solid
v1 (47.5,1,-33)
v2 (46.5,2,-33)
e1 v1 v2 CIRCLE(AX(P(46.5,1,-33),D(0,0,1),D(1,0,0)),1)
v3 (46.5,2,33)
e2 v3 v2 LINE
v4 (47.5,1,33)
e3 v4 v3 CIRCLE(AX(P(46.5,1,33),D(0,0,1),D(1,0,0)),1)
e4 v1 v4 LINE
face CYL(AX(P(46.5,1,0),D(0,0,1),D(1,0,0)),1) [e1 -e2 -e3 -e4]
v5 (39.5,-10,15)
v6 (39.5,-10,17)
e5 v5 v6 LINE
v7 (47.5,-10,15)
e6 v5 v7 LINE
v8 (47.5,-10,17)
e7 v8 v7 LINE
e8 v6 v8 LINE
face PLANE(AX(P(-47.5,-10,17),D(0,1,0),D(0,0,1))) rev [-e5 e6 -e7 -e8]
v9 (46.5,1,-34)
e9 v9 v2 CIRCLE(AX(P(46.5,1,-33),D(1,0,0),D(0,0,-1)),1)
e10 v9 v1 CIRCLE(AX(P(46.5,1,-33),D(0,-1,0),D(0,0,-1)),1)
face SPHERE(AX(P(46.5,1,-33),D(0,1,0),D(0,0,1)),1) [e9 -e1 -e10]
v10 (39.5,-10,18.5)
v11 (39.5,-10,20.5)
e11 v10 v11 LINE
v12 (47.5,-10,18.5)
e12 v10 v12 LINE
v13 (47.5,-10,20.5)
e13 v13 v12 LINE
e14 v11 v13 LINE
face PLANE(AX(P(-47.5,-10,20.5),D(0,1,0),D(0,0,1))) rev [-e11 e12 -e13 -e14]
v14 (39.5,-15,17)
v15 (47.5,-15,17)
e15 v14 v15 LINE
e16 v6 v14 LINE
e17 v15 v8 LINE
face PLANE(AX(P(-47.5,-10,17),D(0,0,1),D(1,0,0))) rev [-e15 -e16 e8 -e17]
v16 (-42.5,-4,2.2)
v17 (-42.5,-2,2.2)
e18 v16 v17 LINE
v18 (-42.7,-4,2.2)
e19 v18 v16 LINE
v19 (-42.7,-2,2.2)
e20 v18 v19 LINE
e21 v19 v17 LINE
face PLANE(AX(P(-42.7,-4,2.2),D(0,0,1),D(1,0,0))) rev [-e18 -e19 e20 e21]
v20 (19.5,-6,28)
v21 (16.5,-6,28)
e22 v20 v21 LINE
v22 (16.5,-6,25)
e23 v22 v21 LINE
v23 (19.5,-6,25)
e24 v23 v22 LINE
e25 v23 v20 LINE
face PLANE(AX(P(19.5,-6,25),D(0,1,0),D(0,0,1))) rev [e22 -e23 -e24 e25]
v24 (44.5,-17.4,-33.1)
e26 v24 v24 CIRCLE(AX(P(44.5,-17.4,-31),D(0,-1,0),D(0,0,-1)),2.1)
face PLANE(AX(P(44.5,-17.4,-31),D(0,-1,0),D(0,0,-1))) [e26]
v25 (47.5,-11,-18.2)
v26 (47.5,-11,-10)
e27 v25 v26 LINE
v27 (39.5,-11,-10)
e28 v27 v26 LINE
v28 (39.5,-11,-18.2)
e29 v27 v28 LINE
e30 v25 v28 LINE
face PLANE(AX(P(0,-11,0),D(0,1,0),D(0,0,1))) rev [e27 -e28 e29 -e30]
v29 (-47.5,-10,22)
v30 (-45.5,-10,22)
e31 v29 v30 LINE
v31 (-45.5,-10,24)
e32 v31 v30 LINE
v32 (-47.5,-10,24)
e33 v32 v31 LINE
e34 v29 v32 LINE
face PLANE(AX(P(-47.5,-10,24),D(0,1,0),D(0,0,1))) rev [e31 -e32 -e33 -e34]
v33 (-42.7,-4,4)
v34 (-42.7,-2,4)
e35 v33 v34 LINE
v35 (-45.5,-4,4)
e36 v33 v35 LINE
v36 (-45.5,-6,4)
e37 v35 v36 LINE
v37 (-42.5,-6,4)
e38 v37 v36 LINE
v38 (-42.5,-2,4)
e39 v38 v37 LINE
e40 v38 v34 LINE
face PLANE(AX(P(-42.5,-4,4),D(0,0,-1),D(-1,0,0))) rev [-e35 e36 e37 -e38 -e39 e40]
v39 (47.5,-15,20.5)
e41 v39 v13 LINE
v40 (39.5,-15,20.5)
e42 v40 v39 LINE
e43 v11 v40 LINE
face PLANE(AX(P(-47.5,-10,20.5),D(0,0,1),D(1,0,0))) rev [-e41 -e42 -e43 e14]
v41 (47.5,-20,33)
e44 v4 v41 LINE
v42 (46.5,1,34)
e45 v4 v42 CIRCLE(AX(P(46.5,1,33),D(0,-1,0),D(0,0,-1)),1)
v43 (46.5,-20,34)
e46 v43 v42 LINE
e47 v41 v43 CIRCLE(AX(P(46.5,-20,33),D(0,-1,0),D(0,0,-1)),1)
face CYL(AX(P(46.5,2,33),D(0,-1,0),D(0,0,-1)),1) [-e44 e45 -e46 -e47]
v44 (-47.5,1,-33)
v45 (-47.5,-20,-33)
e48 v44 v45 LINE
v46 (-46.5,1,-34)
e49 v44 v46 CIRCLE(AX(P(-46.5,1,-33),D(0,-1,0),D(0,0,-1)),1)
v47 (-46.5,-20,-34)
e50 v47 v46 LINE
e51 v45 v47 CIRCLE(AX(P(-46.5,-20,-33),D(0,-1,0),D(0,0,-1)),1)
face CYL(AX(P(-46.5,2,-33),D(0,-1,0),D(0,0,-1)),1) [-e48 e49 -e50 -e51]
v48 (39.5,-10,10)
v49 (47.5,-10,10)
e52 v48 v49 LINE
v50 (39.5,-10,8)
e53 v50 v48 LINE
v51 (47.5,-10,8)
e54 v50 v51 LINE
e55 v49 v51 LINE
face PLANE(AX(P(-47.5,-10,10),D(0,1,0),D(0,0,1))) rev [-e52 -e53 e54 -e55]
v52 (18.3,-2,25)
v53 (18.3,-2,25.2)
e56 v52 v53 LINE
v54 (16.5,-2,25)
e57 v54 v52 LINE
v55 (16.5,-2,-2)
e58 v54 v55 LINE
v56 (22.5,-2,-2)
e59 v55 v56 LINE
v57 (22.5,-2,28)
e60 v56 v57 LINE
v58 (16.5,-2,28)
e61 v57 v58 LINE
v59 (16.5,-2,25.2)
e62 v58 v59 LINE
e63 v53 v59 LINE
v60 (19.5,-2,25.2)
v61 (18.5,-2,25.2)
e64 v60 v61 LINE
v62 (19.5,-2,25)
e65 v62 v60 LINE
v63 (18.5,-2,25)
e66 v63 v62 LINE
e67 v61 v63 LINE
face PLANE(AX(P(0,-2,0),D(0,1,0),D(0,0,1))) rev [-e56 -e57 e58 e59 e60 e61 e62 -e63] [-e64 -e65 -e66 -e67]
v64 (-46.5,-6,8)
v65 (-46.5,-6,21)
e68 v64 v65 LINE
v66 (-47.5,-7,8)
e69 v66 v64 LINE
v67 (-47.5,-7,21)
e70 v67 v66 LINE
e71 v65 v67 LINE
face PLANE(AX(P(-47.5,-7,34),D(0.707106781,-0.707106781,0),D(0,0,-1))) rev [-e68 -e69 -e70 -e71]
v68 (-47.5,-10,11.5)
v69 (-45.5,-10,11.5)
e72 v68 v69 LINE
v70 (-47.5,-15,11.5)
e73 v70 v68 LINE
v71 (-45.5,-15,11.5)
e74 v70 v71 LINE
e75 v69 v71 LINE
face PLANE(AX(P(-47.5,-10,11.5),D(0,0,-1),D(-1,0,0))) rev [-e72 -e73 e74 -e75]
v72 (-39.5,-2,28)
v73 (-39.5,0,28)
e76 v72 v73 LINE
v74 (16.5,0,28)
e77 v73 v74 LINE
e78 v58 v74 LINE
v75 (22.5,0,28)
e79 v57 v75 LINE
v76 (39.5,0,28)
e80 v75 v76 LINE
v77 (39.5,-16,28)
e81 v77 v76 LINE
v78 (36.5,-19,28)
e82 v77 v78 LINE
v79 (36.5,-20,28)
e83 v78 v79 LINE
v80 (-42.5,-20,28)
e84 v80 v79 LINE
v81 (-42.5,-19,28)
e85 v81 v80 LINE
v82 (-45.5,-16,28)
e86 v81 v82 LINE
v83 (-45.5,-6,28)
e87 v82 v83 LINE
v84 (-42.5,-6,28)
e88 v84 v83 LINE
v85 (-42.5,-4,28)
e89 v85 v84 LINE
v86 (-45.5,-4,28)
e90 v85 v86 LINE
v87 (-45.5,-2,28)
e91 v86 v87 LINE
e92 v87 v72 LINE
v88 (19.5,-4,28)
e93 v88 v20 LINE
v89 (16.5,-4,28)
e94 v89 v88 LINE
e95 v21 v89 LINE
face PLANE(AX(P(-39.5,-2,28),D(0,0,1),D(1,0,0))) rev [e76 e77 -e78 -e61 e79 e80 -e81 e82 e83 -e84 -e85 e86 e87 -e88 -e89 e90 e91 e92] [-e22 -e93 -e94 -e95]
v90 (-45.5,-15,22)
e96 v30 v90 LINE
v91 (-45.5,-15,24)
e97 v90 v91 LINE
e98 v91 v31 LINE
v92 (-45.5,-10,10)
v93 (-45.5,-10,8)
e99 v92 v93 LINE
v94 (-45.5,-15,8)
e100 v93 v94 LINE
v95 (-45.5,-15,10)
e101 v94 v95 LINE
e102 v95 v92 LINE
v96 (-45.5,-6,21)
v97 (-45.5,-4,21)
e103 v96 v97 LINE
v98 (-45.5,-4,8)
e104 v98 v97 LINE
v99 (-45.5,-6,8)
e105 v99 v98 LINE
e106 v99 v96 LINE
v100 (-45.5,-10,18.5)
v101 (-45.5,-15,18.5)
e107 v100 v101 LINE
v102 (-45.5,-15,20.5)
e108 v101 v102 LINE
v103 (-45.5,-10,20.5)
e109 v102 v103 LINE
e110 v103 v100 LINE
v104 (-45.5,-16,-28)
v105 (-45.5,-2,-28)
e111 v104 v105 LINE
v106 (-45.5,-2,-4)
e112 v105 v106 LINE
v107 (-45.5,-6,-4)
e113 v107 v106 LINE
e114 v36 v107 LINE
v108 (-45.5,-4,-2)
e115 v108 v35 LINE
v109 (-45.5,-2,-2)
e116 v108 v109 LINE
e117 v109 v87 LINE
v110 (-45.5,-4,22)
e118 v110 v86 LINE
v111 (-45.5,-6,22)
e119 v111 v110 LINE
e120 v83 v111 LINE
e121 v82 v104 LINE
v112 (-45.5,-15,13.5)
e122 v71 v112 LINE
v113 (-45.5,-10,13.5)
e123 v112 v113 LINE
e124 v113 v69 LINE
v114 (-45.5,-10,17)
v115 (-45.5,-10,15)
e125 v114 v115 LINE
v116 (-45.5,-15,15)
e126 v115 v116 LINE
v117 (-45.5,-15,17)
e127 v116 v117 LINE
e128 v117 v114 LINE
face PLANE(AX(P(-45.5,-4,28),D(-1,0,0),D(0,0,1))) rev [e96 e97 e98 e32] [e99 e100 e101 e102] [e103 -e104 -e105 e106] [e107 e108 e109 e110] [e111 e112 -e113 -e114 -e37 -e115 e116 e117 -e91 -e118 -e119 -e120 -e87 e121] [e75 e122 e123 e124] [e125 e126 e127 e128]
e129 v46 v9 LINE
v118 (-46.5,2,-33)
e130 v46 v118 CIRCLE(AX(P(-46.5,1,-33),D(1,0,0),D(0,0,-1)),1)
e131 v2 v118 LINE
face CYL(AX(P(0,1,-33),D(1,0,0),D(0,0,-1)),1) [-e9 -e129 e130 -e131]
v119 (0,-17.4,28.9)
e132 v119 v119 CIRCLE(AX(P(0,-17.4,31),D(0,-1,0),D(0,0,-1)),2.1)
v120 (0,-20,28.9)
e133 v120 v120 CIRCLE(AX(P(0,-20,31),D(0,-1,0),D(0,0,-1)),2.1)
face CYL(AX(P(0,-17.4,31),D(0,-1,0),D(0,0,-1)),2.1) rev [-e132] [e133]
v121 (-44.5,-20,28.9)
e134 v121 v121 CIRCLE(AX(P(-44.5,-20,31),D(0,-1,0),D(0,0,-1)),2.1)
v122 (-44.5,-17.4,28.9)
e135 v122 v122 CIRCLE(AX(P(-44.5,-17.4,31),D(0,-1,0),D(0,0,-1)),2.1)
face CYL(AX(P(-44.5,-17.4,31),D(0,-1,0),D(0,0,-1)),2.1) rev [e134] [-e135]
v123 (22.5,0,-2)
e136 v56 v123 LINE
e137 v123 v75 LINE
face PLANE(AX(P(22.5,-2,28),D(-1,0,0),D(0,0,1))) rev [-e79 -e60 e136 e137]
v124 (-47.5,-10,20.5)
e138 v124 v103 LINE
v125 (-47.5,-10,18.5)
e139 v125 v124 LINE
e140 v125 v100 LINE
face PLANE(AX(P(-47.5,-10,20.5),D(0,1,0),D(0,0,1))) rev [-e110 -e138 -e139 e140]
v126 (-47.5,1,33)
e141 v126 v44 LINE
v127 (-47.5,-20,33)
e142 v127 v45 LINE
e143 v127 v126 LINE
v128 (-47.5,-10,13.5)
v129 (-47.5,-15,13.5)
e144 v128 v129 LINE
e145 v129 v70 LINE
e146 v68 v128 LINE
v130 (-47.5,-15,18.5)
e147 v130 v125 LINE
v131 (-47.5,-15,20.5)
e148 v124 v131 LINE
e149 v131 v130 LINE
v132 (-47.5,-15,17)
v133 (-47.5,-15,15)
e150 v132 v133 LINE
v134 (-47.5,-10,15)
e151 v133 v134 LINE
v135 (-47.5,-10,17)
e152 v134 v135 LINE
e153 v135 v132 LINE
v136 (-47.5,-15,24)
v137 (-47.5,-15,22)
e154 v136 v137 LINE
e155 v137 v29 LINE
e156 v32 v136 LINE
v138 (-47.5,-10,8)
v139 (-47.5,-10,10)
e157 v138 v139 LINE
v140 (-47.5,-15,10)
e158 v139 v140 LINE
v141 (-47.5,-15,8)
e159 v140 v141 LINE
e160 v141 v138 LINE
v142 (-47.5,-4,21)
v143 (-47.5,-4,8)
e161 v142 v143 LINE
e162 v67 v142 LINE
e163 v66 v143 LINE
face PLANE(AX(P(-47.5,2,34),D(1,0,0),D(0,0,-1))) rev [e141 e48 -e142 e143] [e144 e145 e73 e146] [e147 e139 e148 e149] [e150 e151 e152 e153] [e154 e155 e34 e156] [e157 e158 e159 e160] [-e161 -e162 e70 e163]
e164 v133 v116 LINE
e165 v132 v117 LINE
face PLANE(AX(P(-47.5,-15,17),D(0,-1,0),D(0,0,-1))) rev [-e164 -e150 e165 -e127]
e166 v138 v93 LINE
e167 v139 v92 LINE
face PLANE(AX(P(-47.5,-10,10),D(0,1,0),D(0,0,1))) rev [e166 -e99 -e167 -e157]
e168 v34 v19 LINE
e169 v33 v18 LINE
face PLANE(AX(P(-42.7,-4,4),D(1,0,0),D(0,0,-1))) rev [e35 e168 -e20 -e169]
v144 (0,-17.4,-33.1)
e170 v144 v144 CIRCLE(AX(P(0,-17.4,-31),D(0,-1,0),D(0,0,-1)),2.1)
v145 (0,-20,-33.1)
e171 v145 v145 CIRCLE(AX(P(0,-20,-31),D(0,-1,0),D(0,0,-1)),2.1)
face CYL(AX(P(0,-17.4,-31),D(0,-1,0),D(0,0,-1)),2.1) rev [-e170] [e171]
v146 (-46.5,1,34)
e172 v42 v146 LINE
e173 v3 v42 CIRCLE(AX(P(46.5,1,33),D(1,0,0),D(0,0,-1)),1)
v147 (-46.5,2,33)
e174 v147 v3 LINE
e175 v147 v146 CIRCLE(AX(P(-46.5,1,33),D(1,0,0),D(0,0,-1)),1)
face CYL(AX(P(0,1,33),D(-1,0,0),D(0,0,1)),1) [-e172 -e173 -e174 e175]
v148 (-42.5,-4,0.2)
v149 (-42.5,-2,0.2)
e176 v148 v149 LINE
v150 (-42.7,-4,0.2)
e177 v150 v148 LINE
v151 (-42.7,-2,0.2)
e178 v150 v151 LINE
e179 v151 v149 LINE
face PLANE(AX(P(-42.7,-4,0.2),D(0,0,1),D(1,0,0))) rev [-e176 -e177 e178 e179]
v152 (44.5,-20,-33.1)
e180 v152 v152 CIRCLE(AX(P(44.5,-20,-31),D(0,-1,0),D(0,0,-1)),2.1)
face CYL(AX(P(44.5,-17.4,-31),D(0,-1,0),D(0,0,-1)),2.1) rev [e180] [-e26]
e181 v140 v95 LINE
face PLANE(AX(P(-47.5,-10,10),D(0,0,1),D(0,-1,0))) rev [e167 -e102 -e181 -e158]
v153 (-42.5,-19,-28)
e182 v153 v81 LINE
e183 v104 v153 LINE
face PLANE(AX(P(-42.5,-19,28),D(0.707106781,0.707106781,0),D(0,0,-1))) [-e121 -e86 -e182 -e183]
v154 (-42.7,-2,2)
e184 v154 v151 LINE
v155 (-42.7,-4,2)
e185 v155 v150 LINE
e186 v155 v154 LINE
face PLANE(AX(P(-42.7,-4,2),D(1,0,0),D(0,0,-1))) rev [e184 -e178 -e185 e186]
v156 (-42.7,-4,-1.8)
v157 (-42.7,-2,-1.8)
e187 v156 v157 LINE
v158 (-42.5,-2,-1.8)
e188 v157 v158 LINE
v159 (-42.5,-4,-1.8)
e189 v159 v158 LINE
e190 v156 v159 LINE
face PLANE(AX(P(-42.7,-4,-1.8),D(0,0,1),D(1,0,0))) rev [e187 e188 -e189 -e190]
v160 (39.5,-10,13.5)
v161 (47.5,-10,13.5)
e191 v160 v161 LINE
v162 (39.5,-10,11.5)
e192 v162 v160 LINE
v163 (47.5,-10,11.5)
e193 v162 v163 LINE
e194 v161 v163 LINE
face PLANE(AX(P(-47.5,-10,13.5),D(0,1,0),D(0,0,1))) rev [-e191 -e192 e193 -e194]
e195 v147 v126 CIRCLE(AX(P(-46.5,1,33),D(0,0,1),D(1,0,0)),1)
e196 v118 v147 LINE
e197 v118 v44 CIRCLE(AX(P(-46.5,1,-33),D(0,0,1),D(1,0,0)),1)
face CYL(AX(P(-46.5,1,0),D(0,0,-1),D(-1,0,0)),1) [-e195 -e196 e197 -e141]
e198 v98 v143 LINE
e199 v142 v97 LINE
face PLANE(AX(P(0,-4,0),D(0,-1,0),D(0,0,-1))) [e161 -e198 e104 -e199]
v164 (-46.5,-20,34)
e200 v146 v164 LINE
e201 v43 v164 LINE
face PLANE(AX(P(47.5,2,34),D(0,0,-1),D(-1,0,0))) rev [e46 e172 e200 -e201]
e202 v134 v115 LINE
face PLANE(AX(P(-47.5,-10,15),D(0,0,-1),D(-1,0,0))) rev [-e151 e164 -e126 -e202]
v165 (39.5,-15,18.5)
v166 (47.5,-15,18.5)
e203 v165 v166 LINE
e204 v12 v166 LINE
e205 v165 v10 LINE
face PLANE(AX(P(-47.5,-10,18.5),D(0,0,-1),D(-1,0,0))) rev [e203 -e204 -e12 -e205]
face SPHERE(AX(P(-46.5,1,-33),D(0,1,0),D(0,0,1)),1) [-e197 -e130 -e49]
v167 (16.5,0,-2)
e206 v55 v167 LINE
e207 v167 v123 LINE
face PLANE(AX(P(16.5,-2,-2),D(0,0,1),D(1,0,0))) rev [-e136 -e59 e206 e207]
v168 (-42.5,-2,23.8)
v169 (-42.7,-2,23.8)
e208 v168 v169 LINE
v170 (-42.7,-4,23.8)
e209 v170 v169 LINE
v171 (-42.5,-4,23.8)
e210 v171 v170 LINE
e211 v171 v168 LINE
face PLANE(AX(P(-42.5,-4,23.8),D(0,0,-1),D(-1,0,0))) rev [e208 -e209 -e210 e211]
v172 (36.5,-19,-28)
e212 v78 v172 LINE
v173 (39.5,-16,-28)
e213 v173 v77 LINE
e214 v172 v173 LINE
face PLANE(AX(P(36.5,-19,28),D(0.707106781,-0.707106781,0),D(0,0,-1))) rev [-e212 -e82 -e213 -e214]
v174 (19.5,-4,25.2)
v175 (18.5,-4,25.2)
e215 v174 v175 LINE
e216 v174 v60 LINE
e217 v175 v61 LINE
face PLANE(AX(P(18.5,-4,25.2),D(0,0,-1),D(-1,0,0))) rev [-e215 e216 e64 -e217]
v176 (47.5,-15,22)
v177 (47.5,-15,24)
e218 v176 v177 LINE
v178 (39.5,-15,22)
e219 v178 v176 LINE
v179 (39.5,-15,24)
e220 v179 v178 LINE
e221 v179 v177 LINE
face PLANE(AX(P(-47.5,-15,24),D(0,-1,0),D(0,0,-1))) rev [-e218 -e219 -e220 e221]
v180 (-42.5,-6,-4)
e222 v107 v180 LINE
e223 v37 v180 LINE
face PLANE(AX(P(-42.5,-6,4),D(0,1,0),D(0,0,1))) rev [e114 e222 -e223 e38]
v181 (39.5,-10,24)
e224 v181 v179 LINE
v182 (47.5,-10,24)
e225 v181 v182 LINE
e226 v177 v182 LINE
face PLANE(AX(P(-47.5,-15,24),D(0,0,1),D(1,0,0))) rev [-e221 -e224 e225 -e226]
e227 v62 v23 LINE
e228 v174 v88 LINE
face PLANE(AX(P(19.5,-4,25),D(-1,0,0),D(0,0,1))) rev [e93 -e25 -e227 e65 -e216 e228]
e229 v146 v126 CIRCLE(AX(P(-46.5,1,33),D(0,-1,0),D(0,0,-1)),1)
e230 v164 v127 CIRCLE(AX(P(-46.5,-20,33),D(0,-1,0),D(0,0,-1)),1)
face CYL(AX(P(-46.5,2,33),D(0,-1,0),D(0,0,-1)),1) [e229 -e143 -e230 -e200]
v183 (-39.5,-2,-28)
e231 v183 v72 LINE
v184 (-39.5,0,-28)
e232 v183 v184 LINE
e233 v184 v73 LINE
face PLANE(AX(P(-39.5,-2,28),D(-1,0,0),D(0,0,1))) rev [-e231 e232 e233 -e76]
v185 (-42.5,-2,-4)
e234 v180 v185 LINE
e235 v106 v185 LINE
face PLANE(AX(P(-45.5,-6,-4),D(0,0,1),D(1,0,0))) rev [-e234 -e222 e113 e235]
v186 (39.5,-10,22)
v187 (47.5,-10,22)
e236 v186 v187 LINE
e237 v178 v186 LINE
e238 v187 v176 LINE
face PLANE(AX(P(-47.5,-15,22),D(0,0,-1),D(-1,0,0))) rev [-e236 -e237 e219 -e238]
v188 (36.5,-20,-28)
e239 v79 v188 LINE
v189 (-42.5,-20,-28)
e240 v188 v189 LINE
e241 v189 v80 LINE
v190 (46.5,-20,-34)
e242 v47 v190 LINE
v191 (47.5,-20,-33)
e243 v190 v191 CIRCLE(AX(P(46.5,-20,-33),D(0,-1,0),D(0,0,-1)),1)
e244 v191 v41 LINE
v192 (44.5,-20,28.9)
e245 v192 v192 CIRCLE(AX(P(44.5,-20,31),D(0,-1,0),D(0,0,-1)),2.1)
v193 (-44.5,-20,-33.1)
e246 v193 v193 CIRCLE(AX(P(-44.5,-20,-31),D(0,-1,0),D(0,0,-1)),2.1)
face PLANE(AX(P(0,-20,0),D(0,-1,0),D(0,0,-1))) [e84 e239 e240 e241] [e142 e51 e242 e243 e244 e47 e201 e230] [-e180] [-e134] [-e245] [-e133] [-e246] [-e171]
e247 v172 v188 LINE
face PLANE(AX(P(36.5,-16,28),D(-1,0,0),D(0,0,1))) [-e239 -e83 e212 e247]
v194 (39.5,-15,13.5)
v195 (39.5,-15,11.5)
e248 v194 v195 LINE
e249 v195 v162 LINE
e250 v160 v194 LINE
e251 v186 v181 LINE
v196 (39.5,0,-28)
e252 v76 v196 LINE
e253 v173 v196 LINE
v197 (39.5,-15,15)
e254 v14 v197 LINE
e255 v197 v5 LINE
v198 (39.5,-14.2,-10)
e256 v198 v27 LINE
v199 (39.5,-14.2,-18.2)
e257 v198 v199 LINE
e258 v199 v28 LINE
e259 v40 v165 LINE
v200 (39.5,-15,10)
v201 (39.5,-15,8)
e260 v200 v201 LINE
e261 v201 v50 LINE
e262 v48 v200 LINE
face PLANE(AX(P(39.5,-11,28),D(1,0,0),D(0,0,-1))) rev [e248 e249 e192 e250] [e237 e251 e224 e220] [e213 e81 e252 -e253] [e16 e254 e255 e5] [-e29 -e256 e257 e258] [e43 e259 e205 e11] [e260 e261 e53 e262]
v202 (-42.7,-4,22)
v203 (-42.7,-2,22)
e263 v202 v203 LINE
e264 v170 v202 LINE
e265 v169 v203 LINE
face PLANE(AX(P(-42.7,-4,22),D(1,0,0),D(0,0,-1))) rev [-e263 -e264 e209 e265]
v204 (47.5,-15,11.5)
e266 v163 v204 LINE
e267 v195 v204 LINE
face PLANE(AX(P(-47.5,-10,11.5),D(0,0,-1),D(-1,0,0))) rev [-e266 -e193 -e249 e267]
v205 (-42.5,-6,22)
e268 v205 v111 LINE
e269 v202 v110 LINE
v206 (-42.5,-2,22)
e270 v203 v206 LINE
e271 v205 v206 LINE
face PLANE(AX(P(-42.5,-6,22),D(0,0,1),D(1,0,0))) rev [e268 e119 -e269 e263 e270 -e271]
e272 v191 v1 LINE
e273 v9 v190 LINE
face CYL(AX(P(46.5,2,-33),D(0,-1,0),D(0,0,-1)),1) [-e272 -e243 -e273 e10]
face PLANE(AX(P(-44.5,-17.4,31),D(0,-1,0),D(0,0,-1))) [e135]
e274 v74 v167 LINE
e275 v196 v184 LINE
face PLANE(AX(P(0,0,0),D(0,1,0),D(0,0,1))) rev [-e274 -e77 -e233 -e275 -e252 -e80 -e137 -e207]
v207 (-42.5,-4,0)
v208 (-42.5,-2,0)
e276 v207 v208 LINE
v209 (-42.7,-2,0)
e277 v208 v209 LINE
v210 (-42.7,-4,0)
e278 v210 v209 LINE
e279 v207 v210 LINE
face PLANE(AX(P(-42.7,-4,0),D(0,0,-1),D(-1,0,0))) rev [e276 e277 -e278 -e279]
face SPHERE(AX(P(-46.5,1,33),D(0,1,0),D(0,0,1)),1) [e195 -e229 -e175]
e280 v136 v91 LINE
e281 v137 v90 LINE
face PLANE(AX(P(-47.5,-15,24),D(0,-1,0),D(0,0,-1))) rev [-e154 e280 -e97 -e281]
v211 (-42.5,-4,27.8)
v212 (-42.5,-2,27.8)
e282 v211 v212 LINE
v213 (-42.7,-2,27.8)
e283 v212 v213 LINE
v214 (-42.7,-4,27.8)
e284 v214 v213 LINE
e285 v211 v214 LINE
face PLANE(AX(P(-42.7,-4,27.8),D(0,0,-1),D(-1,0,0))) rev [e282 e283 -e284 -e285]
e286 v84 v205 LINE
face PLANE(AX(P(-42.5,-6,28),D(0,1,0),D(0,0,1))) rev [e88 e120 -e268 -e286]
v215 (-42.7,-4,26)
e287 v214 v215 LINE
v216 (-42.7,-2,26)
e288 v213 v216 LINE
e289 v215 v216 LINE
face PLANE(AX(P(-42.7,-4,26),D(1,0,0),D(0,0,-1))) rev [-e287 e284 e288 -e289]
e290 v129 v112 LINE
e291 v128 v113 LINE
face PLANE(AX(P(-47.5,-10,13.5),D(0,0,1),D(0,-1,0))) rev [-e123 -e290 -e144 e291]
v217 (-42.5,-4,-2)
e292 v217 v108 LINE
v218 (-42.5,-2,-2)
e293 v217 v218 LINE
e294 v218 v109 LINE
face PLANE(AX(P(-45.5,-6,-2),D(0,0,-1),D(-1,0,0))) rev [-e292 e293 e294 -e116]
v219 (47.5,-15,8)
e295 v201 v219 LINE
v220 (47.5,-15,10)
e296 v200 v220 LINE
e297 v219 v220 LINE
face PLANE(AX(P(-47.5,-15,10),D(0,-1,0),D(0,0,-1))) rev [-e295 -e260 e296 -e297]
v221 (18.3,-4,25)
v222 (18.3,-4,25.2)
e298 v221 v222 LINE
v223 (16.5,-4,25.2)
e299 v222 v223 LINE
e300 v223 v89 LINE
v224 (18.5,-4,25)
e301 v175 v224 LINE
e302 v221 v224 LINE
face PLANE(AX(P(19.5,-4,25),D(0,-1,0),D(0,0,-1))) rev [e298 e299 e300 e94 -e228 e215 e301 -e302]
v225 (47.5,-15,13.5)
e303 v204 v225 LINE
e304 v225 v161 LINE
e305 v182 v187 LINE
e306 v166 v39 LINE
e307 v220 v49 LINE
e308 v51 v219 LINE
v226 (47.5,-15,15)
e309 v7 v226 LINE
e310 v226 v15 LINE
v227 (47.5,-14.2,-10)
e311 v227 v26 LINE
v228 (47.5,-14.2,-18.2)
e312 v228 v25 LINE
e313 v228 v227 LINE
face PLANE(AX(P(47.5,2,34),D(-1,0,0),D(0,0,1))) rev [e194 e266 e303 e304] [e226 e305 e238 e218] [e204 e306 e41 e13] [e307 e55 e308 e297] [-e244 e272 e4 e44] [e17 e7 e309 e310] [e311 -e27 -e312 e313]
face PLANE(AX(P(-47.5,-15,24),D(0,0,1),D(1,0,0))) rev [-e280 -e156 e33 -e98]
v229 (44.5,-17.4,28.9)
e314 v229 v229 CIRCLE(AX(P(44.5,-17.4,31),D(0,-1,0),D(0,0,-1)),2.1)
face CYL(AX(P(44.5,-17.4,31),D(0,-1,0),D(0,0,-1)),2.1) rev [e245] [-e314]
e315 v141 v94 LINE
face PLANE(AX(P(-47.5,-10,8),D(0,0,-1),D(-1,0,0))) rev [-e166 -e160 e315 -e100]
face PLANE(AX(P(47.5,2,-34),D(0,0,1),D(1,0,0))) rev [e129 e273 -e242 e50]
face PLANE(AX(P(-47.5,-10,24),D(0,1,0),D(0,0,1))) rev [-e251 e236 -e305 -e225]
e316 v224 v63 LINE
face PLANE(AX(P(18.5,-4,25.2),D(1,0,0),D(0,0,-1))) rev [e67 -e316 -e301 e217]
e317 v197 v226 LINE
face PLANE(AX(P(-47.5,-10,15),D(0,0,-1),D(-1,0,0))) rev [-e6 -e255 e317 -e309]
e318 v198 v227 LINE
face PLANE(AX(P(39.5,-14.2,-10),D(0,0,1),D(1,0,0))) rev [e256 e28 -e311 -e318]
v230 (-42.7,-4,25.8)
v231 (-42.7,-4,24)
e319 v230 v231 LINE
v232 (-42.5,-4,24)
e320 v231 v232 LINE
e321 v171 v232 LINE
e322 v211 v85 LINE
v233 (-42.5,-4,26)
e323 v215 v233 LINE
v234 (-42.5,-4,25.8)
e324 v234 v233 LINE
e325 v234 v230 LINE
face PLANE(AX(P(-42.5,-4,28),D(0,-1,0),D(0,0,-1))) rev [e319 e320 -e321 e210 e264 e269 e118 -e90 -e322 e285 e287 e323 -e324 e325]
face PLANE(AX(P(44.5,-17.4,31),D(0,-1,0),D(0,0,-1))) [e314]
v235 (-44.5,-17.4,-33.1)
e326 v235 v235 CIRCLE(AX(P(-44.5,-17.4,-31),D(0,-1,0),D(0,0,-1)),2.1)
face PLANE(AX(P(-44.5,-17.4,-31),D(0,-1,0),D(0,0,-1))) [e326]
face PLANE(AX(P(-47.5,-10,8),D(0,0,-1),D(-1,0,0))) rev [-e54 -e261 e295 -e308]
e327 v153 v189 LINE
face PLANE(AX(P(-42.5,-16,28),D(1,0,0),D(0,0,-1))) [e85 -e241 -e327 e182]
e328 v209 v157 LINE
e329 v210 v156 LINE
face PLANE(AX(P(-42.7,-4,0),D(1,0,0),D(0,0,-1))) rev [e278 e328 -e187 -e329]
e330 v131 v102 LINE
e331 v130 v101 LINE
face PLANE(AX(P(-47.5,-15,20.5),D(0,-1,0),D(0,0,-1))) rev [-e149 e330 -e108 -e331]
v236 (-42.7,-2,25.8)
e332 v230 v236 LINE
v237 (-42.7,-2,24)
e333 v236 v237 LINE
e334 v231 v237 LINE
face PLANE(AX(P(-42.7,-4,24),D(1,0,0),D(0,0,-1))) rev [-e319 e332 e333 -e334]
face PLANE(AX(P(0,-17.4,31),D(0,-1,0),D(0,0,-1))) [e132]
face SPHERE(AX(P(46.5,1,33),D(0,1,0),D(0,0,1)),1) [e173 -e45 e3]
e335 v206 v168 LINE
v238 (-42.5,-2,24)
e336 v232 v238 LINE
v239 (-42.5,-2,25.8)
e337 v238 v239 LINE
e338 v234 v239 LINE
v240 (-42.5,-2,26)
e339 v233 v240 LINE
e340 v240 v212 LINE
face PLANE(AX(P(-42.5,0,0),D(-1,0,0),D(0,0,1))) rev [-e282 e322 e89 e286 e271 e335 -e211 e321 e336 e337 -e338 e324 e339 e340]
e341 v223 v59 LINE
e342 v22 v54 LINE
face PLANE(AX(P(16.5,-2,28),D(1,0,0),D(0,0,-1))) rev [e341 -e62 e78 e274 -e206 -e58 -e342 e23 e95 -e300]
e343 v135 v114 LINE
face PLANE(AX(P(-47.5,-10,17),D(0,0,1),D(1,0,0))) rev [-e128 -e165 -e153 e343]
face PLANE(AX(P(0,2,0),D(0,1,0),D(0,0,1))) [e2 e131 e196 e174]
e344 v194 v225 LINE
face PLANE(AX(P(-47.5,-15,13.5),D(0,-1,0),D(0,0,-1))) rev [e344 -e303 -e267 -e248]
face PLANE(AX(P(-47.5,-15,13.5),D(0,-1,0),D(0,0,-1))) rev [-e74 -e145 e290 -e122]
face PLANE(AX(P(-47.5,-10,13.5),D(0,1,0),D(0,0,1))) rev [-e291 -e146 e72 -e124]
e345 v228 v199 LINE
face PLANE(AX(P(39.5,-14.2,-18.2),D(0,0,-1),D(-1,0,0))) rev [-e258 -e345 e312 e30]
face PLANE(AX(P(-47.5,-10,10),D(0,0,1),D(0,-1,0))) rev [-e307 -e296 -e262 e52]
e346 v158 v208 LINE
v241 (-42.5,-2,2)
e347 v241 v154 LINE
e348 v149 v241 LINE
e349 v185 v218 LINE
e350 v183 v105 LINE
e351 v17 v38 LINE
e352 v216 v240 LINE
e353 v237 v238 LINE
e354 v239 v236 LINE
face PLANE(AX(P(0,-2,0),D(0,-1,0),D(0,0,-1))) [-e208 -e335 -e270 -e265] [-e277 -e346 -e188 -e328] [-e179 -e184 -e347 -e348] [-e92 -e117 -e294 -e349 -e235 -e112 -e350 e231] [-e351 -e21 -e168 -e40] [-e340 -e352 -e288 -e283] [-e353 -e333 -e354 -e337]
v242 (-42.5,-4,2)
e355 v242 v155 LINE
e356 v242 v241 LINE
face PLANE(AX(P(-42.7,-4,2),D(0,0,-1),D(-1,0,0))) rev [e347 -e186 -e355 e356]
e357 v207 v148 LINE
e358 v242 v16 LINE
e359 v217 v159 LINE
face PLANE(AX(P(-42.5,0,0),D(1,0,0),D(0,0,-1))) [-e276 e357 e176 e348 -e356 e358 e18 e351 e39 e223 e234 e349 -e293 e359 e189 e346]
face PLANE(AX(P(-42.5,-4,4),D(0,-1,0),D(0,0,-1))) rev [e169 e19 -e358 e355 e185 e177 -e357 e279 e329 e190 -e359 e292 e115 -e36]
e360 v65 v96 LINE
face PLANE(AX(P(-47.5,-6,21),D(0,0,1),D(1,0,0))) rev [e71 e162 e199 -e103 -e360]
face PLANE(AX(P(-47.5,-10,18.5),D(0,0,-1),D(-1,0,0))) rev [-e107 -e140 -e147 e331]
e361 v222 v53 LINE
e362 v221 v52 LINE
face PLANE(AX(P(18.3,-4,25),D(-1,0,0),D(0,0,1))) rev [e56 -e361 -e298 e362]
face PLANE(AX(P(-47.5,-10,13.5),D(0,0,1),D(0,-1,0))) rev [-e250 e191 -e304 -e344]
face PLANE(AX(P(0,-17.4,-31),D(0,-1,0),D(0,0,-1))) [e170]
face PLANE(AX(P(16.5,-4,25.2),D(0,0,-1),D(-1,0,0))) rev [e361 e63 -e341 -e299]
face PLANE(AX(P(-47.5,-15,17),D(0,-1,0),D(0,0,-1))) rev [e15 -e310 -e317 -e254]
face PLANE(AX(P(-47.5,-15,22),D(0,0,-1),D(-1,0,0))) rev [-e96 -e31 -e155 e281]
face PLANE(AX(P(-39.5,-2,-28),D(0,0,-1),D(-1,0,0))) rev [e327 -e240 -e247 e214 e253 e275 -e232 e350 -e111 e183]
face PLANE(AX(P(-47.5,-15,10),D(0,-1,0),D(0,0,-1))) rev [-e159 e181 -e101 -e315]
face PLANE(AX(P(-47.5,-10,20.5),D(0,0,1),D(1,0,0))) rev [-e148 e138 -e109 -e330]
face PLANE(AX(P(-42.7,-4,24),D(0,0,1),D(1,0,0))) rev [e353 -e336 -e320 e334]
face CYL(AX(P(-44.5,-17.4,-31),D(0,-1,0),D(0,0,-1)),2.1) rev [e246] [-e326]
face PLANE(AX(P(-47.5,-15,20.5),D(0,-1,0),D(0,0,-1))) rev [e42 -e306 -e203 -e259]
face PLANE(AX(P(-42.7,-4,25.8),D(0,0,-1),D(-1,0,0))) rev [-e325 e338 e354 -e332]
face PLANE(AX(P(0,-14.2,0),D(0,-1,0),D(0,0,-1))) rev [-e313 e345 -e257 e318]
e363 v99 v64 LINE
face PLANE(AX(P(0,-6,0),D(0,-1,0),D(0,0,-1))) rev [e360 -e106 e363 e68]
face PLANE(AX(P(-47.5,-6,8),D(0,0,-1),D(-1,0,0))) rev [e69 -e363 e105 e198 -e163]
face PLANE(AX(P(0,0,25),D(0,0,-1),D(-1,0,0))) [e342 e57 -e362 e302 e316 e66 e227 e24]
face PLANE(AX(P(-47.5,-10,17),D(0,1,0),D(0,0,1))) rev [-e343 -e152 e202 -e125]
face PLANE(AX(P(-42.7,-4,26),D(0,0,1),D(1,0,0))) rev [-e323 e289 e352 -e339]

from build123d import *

# Parameters (mm, degrees)
SKETCH_1_W               = 95
SKETCH_1_H               = 68
EXTRUDE_1_DEPTH          = 2
EXTRUDE_2_DEPTH          = 2
EXTRUDE_3_DEPTH          = 2
EXTRUDE_4_DEPTH          = 2
EXTRUDE_5_DEPTH          = 14
SKETCH_7_W               = 6
SKETCH_7_H               = 2
EXTRUDE_6_DEPTH          = 3
SKETCH_8_W               = 3
SKETCH_8_H               = 2
EXTRUDE_7_DEPTH          = 4
SKETCH_9_W               = 0.2
SKETCH_9_H               = 1.8
EXTRUDE_8_DEPTH          = 2
SKETCH_13_W              = 3
SKETCH_13_H              = 56
EXTRUDE_10_DEPTH         = 4
CHAMFER_6_SIZE           = 3
EXTRUDE_11_DEPTH         = 2
SKETCH_15_W              = 3
SKETCH_15_H              = 2
EXTRUDE_12_DEPTH         = 3
SKETCH_16_W              = 1.8
SKETCH_16_H              = 0.2
SKETCH_16_W_2            = 1
EXTRUDE_13_DEPTH         = 2
SKETCH_17_W              = 8
SKETCH_17_H              = 56
EXTRUDE_15_DEPTH         = 11
SKETCH_18_W              = 8
SKETCH_18_H              = 38
SKETCH_18_H_2            = 9.8
EXTRUDE_16_DEPTH         = 3.2
SKETCH_19_W              = 8
SKETCH_19_H              = 56
EXTRUDE_17_DEPTH         = 5.8
SKETCH_20_W              = 3
SKETCH_20_H              = 56
EXTRUDE_18_DEPTH         = 4
CHAMFER_7_SIZE           = 3
CHAMFER_8_SIZE           = 1
SKETCH_22_R              = 2.1
CUT_EXTRUDE_1_DEPTH      = 2.6
CUT_EXTRUDE_2_DEPTH      = 103.863987867
CUT_EXTRUDE_2_DEPTH_BACK = 103.863987867
SKETCH_23_W              = 2
SKETCH_23_H              = 5
FILLET_1_R               = 1
FILLET_2_R               = 1


with BuildPart() as part:
    # 草图1 → 凸台-拉伸1 (new body)
    with BuildSketch(Plane(origin=(0, 0, 0), x_dir=(1, 0, 0), z_dir=(0, 1, 0))):
        Rectangle(SKETCH_1_W, SKETCH_1_H)
    extrude(amount=EXTRUDE_1_DEPTH)

    # 草图3 → 凸台-拉伸2 (add)
    with BuildSketch(Plane.XZ):
        Polygon((-47.5, 34), (-39.5, 34), (47.5, 34), (47.5, 28), (-39.5, 28), (-39.5, -28), (47.5, -28), (47.5, -34), (-39.5, -34), (-47.5, -34), align=None)
    extrude(amount=EXTRUDE_2_DEPTH)

    # 草图4 → 凸台-拉伸3 (add)
    with BuildSketch(Plane.XZ.offset(2)):
        Polygon((-47.5, 34), (47.5, 34), (47.5, 28), (-45.5, 28), (-45.5, -28), (47.5, -28), (47.5, -34), (-47.5, -34), (-47.5, -28), (-47.5, 28), align=None)
    extrude(amount=EXTRUDE_3_DEPTH)

    # 草图5 → 凸台-拉伸4 (add)
    with BuildSketch(Plane.XZ.offset(4)):
        Polygon((-47.5, 34), (-45.5, 34), (47.5, 34), (47.5, 28), (-45.5, 28), (-45.5, 21), (-47.5, 21), align=None)
        Polygon((-47.5, 8), (-45.5, 8), (-45.5, -28), (47.5, -28), (47.5, -34), (-45.5, -34), (-47.5, -34), align=None)
    extrude(amount=EXTRUDE_4_DEPTH)

    # 草图6 → 凸台-拉伸5 (add)
    with BuildSketch(Plane.XZ.offset(6)):
        Polygon((-47.5, 34), (-45.5, 34), (47.5, 34), (47.5, 28), (-45.5, 28), (-45.5, -28), (47.5, -28), (47.5, -34), (-45.5, -34), (-47.5, -34), align=None)
    extrude(amount=EXTRUDE_5_DEPTH)

    # 草图7 → 凸台-拉伸6 (add)
    with BuildSketch(Plane(origin=(-45.5, 0, 0), x_dir=(0, 0, -1), z_dir=(1, 0, 0))):
        with Locations((-25, -5)):
            Rectangle(SKETCH_7_W, SKETCH_7_H)
        with Locations((-1, -5)):
            Rectangle(SKETCH_7_W, SKETCH_7_H)
    extrude(amount=EXTRUDE_6_DEPTH)

    # 草图8 → 凸台-拉伸7 (add)
    with BuildSketch(Plane.XZ.offset(2)):
        with Locations((-44, -3)):
            Rectangle(SKETCH_8_W, SKETCH_8_H)
    extrude(amount=EXTRUDE_7_DEPTH)

    # 草图9 → 凸台-拉伸8 (add)
    with BuildSketch(Plane.XZ.offset(2)):
        with Locations((-42.6, 22.9)):
            Rectangle(SKETCH_9_W, SKETCH_9_H)
        with Locations((-42.6, 24.9)):
            Rectangle(SKETCH_9_W, SKETCH_9_H)
        with Locations((-42.6, 26.9)):
            Rectangle(SKETCH_9_W, SKETCH_9_H)
        with Locations((-42.6, 3.1)):
            Rectangle(SKETCH_9_W, SKETCH_9_H)
        with Locations((-42.6, 1.1)):
            Rectangle(SKETCH_9_W, SKETCH_9_H)
        with Locations((-42.6, -0.9)):
            Rectangle(SKETCH_9_W, SKETCH_9_H)
    extrude(amount=EXTRUDE_8_DEPTH)

    # 草图13 → 凸台-拉伸10 (add)
    with BuildSketch(Plane.XZ.offset(20)):
        with Locations((-44, 0)):
            Rectangle(SKETCH_13_W, SKETCH_13_H)
    extrude(amount=-EXTRUDE_10_DEPTH)

    # 倒角6
    chamfer_6_edges = [part.edges().sort_by_distance(p)[0] for p in [
        (-42.5, -16, 0),
    ]]
    chamfer(chamfer_6_edges, length=CHAMFER_6_SIZE - 0.0001)  # a hair under: the kernel refuses the full size

    # 草图14 → 凸台-拉伸11 (add)
    with BuildSketch(Plane.XZ):
        Polygon((16.5, 28), (16.5, -2), (19.5, -2), (22.5, -2), (22.5, 28), (19.5, 28), align=None)
    extrude(amount=EXTRUDE_11_DEPTH)

    # 草图15 → 凸台-拉伸12 (add)
    with BuildSketch(Plane(origin=(0, 0, 28), x_dir=(-1, 0, 0), z_dir=(0, 0, -1))):
        with Locations((-18, -5)):
            Rectangle(SKETCH_15_W, SKETCH_15_H)
    extrude(amount=EXTRUDE_12_DEPTH)

    # 草图16 → 凸台-拉伸13 (add)
    with BuildSketch(Plane.XZ.offset(2)):
        with Locations((17.4, 25.1)):
            Rectangle(SKETCH_16_W, SKETCH_16_H)
        with Locations((19, 25.1)):
            Rectangle(SKETCH_16_W_2, SKETCH_16_H)
    extrude(amount=EXTRUDE_13_DEPTH)

    # 草图17 → 凸台-拉伸15 (add)
    with BuildSketch(Plane.XZ):
        with Locations((43.5, 0)):
            Rectangle(SKETCH_17_W, SKETCH_17_H)
    extrude(amount=EXTRUDE_15_DEPTH)

    # 草图18 → 凸台-拉伸16 (add)
    with BuildSketch(Plane.XZ.offset(11)):
        with Locations((43.5, 9)):
            Rectangle(SKETCH_18_W, SKETCH_18_H)
        with Locations((43.5, -23.1)):
            Rectangle(SKETCH_18_W, SKETCH_18_H_2)
    extrude(amount=EXTRUDE_16_DEPTH)

    # 草图19 → 凸台-拉伸17 (add)
    with BuildSketch(Plane.XZ.offset(14.2)):
        with Locations((43.5, 0)):
            Rectangle(SKETCH_19_W, SKETCH_19_H)
    extrude(amount=EXTRUDE_17_DEPTH)

    # 草图20 → 凸台-拉伸18 (add)
    with BuildSketch(Plane.XZ.offset(20)):
        with Locations((38, 0)):
            Rectangle(SKETCH_20_W, SKETCH_20_H)
    extrude(amount=-EXTRUDE_18_DEPTH)

    # 倒角7
    chamfer_7_edges = [part.edges().sort_by_distance(p)[0] for p in [
        (36.5, -16, 0),
    ]]
    chamfer(chamfer_7_edges, length=CHAMFER_7_SIZE - 0.0001)  # a hair under: the kernel refuses the full size

    # 倒角8
    chamfer_8_edges = [part.edges().sort_by_distance(p)[0] for p in [
        (-47.5, -6, 14.5),
    ]]
    chamfer(chamfer_8_edges, length=CHAMFER_8_SIZE)

    # 草图22 → 切除-拉伸1 (cut)
    with BuildSketch(Plane.XZ.offset(20)):
        with Locations(Location((-44.5, 31, 0), (0, 0, 270))):
            Circle(SKETCH_22_R)
        with Locations(Location((0, 31, 0), (0, 0, 270))):
            Circle(SKETCH_22_R)
        with Locations(Location((44.5, 31, 0), (0, 0, 270))):
            Circle(SKETCH_22_R)
        with Locations(Location((44.5, -31, 0), (0, 0, 270))):
            Circle(SKETCH_22_R)
        with Locations(Location((0, -31, 0), (0, 0, 270))):
            Circle(SKETCH_22_R)
        with Locations(Location((-44.5, -31, 0), (0, 0, 270))):
            Circle(SKETCH_22_R)
    extrude(amount=-CUT_EXTRUDE_1_DEPTH, mode=Mode.SUBTRACT)

    # 草图23 → 切除-拉伸2 (cut, two sides: drawn at the far end of the back side and taken through both)
    with BuildSketch(Plane(origin=(47.5, 0, 0), x_dir=(0, 0, -1), z_dir=(1, 0, 0)).offset(-CUT_EXTRUDE_2_DEPTH_BACK)):
        with Locations((-23, -12.5)):
            Rectangle(SKETCH_23_W, SKETCH_23_H)
        with Locations((-19.5, -12.5)):
            Rectangle(SKETCH_23_W, SKETCH_23_H)
        with Locations((-16, -12.5)):
            Rectangle(SKETCH_23_W, SKETCH_23_H)
        with Locations((-12.5, -12.5)):
            Rectangle(SKETCH_23_W, SKETCH_23_H)
        with Locations((-9, -12.5)):
            Rectangle(SKETCH_23_W, SKETCH_23_H)
    extrude(amount=CUT_EXTRUDE_2_DEPTH + CUT_EXTRUDE_2_DEPTH_BACK, mode=Mode.SUBTRACT)

    # 圆角1
    fillet_1_edges = [part.edges().sort_by_distance(p)[0] for p in [
        (-47.5, -9, -34),
        (47.5, -9, -34),
        (47.5, -9, 34),
        (-47.5, -9, 34),
    ]]
    fillet(fillet_1_edges, radius=FILLET_1_R)

    # 圆角2
    fillet_2_edges = [part.edges().sort_by_distance(p)[0] for p in [
        (0, 2, -34),
        (47.5, 2, 0),
        (-47.5, 2, 0),
        (0, 2, 34),
        (-47.207106781, 2, 33.707106781),
        (-47.207106781, 2, -33.707106781),
        (47.207106781, 2, 33.707106781),
        (47.207106781, 2, -33.707106781),
    ]]
    fillet(fillet_2_edges, radius=FILLET_2_R)


solid = part.part
